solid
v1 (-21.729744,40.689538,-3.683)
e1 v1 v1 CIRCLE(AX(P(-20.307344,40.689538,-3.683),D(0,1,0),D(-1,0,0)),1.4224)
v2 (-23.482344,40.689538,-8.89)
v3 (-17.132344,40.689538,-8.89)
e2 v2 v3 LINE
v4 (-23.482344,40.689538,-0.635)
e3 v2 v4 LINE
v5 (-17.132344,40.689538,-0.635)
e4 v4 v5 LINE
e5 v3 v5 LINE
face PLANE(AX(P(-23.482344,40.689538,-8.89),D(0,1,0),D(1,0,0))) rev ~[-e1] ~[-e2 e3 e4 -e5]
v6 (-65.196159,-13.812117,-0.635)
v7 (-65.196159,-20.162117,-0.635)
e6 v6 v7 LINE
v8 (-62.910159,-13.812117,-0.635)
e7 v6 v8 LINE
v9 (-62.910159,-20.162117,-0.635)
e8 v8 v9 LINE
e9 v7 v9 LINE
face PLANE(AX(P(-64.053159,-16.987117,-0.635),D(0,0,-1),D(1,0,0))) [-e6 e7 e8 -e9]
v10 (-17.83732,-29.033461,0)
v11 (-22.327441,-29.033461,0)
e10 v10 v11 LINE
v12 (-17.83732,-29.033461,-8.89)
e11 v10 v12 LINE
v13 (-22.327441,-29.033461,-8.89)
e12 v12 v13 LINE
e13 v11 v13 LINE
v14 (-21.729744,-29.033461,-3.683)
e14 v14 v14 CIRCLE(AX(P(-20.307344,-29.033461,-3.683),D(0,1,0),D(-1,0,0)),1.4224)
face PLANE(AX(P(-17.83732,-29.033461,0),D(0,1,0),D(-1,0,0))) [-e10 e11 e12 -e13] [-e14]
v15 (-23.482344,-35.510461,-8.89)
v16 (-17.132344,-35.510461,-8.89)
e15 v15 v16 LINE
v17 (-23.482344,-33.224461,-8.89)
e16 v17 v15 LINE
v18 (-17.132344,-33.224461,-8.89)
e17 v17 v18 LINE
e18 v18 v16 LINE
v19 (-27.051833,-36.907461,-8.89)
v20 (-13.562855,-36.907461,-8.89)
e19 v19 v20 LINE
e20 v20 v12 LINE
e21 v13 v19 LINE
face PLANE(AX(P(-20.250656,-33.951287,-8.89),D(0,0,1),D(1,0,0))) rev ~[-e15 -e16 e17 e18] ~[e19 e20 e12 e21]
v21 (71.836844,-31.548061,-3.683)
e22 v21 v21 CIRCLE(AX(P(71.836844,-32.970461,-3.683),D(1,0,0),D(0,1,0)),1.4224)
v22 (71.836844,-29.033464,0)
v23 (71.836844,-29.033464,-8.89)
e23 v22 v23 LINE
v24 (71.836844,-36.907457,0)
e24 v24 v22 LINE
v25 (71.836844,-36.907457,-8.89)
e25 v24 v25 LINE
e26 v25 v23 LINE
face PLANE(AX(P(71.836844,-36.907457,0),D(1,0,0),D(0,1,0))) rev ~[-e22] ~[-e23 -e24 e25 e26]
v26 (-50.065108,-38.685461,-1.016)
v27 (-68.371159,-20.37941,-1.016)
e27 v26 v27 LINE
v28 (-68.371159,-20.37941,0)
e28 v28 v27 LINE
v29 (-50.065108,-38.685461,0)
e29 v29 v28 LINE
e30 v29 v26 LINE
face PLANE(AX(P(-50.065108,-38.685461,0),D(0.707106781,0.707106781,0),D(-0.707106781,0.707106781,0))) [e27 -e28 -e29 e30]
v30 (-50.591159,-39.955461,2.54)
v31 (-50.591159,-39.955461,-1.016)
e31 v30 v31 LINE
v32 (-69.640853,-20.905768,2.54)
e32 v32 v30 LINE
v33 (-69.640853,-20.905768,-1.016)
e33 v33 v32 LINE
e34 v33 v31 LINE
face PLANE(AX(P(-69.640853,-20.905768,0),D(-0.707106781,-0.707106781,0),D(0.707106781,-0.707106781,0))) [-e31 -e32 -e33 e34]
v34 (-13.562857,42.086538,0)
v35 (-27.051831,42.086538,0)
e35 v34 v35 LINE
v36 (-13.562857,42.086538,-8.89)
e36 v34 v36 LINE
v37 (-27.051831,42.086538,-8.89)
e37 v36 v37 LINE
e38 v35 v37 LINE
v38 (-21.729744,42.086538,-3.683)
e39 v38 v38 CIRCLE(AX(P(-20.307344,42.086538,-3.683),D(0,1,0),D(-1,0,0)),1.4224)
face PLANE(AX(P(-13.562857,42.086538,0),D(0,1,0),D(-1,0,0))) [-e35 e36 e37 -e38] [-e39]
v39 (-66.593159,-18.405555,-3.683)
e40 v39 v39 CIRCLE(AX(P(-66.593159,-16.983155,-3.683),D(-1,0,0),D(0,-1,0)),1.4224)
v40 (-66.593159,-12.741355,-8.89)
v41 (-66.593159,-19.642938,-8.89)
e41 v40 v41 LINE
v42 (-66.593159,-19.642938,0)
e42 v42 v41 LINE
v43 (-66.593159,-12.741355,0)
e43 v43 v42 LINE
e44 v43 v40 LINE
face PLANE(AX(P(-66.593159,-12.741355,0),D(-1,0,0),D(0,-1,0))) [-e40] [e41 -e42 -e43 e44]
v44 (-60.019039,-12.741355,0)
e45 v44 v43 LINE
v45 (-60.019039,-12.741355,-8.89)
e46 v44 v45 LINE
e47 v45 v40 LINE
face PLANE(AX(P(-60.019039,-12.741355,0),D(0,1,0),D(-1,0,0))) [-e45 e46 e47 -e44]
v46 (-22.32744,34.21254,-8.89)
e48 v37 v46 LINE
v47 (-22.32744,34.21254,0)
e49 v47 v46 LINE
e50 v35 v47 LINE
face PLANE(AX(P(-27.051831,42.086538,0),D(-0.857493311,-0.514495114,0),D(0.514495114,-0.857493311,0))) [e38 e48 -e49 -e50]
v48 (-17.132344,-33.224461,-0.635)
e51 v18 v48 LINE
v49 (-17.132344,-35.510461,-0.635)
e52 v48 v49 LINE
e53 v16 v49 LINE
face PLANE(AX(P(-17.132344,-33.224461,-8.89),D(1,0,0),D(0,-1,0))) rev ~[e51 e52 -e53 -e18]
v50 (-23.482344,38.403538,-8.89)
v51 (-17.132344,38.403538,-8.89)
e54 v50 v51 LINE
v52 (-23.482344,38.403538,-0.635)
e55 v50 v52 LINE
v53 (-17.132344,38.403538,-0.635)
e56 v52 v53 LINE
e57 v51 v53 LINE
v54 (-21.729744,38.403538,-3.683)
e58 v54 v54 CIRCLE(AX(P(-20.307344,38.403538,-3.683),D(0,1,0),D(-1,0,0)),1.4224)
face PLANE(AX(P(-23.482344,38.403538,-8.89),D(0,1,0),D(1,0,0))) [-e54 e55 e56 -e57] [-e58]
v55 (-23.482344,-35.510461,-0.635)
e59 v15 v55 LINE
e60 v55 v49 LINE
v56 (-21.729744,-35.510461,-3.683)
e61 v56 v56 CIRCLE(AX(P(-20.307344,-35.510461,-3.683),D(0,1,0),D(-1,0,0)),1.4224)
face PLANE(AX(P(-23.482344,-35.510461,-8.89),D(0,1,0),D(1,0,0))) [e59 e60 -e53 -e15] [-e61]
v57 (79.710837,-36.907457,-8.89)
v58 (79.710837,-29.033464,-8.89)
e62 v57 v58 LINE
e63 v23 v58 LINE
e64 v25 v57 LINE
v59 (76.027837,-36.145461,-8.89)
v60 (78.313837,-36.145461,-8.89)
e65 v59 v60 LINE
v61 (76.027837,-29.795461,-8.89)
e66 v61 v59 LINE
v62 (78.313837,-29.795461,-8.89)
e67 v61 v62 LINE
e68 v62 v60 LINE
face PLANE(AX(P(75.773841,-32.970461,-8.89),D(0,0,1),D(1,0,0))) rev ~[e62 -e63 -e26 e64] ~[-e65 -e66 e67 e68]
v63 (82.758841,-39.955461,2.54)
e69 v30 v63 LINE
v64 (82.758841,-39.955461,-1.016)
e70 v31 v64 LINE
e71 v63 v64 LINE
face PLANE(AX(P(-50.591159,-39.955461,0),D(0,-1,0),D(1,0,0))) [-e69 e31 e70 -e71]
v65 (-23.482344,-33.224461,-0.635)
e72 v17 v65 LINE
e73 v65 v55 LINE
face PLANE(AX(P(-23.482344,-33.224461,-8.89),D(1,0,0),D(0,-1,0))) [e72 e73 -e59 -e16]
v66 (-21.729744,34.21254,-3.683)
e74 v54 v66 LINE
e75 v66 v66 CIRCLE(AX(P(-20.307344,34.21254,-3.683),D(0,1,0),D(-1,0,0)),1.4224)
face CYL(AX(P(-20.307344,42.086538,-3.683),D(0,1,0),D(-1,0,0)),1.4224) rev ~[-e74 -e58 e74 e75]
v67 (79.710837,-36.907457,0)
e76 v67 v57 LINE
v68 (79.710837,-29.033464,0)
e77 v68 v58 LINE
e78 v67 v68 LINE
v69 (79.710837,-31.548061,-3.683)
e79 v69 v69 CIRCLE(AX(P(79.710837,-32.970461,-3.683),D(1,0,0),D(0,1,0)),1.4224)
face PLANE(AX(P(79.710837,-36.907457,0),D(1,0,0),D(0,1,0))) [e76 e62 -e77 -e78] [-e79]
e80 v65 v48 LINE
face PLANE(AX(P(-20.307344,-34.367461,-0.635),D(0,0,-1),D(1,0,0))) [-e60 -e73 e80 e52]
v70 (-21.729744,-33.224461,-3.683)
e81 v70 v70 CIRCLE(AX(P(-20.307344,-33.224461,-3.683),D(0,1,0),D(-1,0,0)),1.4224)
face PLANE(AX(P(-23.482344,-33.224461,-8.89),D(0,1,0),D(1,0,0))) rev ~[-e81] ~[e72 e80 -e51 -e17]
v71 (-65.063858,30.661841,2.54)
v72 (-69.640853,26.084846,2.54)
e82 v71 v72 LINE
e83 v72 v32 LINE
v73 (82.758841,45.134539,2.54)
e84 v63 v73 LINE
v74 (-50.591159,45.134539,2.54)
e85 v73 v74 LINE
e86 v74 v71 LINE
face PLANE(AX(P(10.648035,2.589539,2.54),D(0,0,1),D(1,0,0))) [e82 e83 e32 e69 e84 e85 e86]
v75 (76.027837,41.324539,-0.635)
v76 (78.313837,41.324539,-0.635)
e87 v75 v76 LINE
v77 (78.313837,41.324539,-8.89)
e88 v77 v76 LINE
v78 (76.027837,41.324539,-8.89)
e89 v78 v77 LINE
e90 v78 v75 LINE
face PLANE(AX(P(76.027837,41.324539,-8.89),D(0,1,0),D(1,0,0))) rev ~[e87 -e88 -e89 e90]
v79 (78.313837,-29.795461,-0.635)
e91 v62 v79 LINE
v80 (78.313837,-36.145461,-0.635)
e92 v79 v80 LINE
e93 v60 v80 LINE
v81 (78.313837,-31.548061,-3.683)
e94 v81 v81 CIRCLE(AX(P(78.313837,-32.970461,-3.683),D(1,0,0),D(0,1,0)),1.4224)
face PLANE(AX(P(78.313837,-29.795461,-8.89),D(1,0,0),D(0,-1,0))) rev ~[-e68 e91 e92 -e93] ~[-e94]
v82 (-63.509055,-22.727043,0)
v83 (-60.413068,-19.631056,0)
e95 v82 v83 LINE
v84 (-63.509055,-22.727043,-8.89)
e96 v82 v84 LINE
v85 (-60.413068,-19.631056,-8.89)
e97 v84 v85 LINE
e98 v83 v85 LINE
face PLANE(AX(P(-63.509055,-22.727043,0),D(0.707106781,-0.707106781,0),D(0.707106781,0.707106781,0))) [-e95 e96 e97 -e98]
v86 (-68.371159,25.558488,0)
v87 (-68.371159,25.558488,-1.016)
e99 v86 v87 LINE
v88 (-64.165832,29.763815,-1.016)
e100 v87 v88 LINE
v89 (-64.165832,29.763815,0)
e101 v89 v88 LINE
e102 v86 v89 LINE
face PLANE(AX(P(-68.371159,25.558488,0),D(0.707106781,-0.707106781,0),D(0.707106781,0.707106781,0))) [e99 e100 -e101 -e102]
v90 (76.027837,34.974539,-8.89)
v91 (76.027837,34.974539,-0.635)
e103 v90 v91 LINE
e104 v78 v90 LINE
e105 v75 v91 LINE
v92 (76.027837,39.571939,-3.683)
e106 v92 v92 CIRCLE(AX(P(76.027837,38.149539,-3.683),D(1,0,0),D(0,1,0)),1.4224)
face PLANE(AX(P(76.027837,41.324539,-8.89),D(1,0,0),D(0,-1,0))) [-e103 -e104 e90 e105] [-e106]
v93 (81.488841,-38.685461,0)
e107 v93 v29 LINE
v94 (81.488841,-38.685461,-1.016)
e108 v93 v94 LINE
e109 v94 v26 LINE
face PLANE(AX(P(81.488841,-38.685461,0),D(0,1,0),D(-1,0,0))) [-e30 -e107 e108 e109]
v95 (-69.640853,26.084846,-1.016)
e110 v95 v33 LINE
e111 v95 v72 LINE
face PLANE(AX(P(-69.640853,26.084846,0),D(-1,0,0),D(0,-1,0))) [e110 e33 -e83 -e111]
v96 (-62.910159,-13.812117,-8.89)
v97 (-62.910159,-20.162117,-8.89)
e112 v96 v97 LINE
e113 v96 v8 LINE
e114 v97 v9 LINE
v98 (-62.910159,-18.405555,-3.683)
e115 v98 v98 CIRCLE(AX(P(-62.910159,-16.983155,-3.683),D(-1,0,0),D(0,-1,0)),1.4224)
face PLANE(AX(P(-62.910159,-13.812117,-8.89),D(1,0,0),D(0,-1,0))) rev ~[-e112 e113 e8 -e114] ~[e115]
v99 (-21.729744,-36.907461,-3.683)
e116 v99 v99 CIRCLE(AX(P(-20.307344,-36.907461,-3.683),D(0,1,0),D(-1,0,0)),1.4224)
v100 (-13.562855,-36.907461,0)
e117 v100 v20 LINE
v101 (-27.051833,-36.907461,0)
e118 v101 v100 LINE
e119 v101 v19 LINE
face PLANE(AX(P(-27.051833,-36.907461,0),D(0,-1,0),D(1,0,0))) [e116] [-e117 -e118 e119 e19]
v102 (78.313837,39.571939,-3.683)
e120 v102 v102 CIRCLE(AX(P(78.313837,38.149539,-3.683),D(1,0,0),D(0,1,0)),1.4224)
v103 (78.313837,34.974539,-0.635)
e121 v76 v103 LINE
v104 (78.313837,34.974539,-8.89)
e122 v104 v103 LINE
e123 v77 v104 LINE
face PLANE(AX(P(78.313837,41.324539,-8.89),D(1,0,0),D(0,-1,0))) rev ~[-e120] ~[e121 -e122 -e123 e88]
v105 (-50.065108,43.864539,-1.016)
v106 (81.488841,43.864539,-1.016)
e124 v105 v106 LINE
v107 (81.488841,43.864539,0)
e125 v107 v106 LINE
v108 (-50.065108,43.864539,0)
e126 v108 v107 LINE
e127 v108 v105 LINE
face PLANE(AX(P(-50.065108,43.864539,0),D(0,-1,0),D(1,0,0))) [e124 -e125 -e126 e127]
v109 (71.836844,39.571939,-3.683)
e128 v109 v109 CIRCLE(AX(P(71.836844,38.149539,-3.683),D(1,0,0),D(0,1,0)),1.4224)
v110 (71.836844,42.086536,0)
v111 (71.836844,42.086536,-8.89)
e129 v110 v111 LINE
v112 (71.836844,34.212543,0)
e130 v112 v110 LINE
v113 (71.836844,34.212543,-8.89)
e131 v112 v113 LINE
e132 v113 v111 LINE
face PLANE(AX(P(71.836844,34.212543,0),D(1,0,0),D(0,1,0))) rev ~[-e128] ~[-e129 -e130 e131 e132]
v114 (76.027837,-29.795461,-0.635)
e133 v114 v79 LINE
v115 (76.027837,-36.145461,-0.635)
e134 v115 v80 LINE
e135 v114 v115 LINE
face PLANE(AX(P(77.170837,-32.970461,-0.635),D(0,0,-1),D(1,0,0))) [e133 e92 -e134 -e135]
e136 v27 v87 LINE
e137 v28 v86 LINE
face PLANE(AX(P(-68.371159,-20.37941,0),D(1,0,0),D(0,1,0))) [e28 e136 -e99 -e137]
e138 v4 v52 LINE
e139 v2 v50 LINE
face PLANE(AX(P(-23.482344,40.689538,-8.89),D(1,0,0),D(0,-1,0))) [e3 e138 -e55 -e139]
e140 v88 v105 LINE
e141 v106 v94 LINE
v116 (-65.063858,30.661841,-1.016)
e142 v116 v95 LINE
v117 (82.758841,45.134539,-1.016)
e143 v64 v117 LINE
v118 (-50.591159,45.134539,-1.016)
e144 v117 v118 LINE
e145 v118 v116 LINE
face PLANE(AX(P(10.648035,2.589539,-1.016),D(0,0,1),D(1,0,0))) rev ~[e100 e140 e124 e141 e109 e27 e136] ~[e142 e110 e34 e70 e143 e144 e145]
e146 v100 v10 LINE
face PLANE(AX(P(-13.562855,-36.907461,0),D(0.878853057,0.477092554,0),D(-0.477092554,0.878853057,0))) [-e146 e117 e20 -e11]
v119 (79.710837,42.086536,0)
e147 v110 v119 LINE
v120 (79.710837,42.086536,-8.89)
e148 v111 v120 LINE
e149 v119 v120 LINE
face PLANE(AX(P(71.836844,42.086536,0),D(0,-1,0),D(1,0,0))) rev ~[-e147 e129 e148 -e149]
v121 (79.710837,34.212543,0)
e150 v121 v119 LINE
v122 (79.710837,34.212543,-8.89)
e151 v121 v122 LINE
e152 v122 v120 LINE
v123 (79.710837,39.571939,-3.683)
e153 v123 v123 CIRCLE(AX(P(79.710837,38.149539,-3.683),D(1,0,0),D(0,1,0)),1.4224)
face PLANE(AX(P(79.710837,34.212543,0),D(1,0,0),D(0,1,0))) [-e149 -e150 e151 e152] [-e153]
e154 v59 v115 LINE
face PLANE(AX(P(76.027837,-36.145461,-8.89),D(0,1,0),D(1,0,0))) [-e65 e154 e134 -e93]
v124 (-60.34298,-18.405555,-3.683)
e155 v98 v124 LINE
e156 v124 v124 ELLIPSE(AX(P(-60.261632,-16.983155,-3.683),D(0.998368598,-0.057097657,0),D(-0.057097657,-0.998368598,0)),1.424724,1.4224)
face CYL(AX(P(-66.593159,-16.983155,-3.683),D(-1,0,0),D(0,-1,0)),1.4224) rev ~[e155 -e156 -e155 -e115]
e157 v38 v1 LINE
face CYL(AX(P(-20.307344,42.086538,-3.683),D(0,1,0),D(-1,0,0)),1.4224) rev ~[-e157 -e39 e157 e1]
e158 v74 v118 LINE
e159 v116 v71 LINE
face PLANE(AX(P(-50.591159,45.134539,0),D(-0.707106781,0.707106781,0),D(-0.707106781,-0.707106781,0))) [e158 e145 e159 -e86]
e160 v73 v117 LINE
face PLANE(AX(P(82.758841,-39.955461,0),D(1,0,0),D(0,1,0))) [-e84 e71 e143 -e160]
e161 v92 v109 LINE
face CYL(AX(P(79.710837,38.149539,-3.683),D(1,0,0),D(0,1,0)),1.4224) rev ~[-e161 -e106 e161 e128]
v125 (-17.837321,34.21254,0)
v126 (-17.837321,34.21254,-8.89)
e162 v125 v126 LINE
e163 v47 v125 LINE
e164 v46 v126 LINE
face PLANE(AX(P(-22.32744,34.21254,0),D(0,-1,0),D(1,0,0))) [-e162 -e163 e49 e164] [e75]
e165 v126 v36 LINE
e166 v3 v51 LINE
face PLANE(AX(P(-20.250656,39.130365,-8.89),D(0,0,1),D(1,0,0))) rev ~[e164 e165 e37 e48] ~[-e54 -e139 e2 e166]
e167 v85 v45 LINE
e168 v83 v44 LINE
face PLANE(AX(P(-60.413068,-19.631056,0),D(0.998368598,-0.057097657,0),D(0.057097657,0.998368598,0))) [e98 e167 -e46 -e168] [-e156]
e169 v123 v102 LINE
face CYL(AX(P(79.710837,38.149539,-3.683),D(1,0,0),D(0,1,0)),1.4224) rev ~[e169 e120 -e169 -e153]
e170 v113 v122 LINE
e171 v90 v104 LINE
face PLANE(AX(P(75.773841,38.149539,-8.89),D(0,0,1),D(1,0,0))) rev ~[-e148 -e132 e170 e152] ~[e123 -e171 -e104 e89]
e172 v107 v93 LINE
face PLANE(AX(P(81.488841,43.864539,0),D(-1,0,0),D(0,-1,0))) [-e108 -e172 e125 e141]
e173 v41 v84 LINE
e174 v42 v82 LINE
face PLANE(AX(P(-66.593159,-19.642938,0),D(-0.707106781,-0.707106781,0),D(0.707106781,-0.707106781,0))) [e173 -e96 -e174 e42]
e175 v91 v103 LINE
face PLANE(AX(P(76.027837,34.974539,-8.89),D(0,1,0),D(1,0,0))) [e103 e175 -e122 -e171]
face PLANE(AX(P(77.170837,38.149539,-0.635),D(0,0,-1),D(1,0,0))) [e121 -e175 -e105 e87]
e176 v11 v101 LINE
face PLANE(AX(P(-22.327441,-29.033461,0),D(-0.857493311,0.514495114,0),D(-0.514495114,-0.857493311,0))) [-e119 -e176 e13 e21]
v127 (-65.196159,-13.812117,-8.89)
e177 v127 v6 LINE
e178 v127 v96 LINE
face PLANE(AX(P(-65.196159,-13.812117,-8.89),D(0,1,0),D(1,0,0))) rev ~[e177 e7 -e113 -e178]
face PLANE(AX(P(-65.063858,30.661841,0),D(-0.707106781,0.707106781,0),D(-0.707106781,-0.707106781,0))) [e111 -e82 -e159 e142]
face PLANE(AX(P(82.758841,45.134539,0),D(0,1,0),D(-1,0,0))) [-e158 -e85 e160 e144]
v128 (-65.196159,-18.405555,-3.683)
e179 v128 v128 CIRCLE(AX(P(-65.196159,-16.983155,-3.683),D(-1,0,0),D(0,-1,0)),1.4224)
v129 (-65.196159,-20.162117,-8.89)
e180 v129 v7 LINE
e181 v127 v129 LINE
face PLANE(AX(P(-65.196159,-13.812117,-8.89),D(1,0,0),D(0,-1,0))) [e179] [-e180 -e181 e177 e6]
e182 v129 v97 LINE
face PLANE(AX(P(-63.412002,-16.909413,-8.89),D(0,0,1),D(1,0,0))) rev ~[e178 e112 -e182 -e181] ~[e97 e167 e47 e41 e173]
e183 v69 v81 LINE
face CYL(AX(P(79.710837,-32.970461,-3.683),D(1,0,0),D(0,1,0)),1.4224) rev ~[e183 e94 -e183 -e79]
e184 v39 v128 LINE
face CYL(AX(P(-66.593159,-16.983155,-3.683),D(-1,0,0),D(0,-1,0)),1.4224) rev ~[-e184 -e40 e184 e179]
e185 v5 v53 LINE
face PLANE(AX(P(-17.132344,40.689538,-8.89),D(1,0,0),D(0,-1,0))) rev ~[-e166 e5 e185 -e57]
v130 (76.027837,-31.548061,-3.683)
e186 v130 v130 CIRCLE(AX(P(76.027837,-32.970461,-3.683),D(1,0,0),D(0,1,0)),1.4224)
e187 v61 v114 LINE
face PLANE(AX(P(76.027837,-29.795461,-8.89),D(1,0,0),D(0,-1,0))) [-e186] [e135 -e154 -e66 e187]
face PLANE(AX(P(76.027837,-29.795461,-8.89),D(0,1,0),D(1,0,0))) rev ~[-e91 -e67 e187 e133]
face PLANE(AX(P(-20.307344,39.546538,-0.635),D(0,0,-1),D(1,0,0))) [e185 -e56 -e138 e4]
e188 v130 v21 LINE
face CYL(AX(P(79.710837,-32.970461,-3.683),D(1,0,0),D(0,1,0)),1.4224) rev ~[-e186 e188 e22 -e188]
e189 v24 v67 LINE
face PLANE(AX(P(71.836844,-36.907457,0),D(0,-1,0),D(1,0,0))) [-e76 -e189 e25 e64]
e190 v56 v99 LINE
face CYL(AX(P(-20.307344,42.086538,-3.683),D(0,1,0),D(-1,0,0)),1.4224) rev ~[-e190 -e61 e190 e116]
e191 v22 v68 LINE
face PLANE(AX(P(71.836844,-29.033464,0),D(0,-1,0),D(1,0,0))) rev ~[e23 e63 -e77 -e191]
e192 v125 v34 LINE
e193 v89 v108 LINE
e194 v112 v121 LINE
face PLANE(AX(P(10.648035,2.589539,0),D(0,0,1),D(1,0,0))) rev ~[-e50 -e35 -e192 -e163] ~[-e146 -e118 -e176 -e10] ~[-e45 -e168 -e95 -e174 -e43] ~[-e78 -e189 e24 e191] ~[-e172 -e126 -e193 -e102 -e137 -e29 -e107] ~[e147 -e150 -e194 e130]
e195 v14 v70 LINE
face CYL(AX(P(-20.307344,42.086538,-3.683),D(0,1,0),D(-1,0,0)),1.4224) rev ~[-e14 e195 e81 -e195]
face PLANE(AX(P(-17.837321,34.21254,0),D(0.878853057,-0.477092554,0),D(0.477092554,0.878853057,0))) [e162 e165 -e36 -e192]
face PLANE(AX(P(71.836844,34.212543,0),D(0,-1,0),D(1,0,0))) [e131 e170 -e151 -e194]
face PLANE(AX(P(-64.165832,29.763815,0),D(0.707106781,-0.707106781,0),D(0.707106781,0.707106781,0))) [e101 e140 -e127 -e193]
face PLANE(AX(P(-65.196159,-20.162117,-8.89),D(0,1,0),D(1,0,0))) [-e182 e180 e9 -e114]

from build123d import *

# Parameters (mm, degrees)
F0_W      = 7.8739928325
F0_H      = 7.8739928325
F1_DEPTH  = 2.54
F2_DEPTH  = 1.016
F3_DEPTH  = 8.89
F8_W      = 2.286
F8_H      = 6.35
F7_W      = 2.286
F7_H      = 6.35
F4_W      = 6.35
F4_H      = 2.286
F5_W      = 2.286
F5_H      = 6.35
F6_W      = 6.35
F6_H      = 2.286
F9_DEPTH  = 8.255
F10_R     = 1.4224
F11_DEPTH = 101.6
F12_R     = 1.4224
F13_R     = 1.4224
F14_DEPTH = 25.4
F15_R     = 1.4224
F16_DEPTH = 25.4


# Not quite as in the source:
# - a feature names something its author has since deleted; it is built from what else it names


with BuildPart() as f1:
    # F0 (on Top) → F1 (new body)
    with BuildSketch(Plane.XY):
        Polygon((-50.5911594971, 45.1345390935), (-65.0638575705, 30.6618410202), (-69.6408525109, 26.0848460797), (-69.6408525109, 9.5127671957), (-69.6408525109, -20.9057678927), (-62.6880467633, -27.8585736403), (-50.5911594971, -39.9554609065), (82.7588405029, -39.9554609065), (82.7588405029, -17.0967224985), (82.7588405029, 43.8645390935), (82.7588405029, 45.1345390935), (33.1444106996, 45.1345390935), (-20.2568043023, 45.1345390935), align=None)
        Polygon((-50.0651082729, -38.6854609065), (-68.3711594971, -20.3794096823), (-68.3711594971, 25.5584878693), (-64.1658319583, 29.763815408), (-50.0651082729, 43.8645390935), (81.4888405029, 43.8645390935), (81.4888405029, -38.6854609065), align=None, mode=Mode.SUBTRACT)
        Polygon((-68.3711594971, 25.5584878693), (-68.3711594971, -20.3794096823), (-50.0651082729, -38.6854609065), (81.4888405029, -38.6854609065), (81.4888405029, 43.8645390935), (-50.0651082729, 43.8645390935), (-64.1658319583, 29.763815408), align=None)
        Polygon((-13.562855112, -36.9074608927), (-27.0518330949, -36.9074608927), (-22.3274411258, -29.0334609202), (-17.8373202542, -29.0334609202), align=None, mode=Mode.SUBTRACT)
        Polygon((-66.5931594971, -19.6429379684), (-66.5931594971, -12.7413552397), (-60.0190392027, -12.7413552397), (-60.413067775, -19.6310556945), (-63.509054773, -22.7270426925), align=None, mode=Mode.SUBTRACT)
        with BuildLine():
            Line((-49.5390570487, -37.4154609065), (-61.7130058245, -25.2415121307))
            Line((-61.7130058245, -25.2415121307), (-58.120903376, -21.6494096823))
            Line((-58.120903376, -21.6494096823), (-56.9411594971, -12.2333584581))
            Line((-56.9411594971, -12.2333584581), (-56.9411594971, -9.6933584581))
            Line((-56.9411594971, -9.6933584581), (-67.1011594971, -9.6933584581))
            Line((-67.1011594971, -9.6933584581), (-67.1011594971, 25.0324366451))
            Line((-67.1011594971, 25.0324366451), (-49.5390570487, 42.5945390935))
            Line((-49.5390570487, 42.5945390935), (-33.3653066841, 42.5945390935))
            ThreePointArc((-33.3653066841, 42.5945390935), (-30.8623950498, 41.9351536832), (-29.0092406655, 40.128174271))
            Line((-29.0092406655, 40.128174271), (-25.1550660971, 33.7045390935))
            ThreePointArc((-25.1550660971, 33.7045390935), (-23.284234992, 31.8649136199), (-20.7556570459, 31.1645390935))
            Line((-20.7556570459, 31.1645390935), (-19.3944751483, 31.1645390935))
            ThreePointArc((-19.3944751483, 31.1645390935), (-16.8544751483, 31.8451300423), (-14.9950660971, 33.7045390935))
            Line((-14.9950660971, 33.7045390935), (-11.6110890868, 39.9381692669))
            ThreePointArc((-11.6110890868, 39.9381692669), (-9.7440488814, 41.8802258253), (-7.1465155593, 42.5945390935))
            Line((-7.1465155593, 42.5945390935), (67.5188405029, 42.5945390935))
            ThreePointArc((67.5188405029, 42.5945390935), (69.3148917271, 41.8505903177), (70.0588405029, 40.0545390935))
            Line((70.0588405029, 40.0545390935), (70.0588405029, 32.4345390935))
            Line((70.0588405029, 32.4345390935), (77.6788405029, 32.4345390935))
            ThreePointArc((77.6788405029, 32.4345390935), (79.4748917271, 31.6905903177), (80.2188405029, 29.8945390935))
            Line((80.2188405029, 29.8945390935), (80.2188405029, -24.7154609065))
            ThreePointArc((80.2188405029, -24.7154609065), (79.4748917271, -26.5115121307), (77.6788405029, -27.2554609065))
            Line((77.6788405029, -27.2554609065), (70.0588405029, -27.2554609065))
            Line((70.0588405029, -27.2554609065), (70.0588405029, -34.8754609065))
            ThreePointArc((70.0588405029, -34.8754609065), (69.3148917271, -36.6715121307), (67.5188405029, -37.4154609065))
            Line((67.5188405029, -37.4154609065), (-7.1465155593, -37.4154609065))
            ThreePointArc((-7.1465155593, -37.4154609065), (-9.7440488814, -36.7011476383), (-11.6110890868, -34.7590910799))
            Line((-11.6110890868, -34.7590910799), (-14.9950660971, -28.5254609065))
            ThreePointArc((-14.9950660971, -28.5254609065), (-16.8544751483, -26.6660518553), (-19.3944751483, -25.9854609065))
            Line((-19.3944751483, -25.9854609065), (-20.7556570459, -25.9854609065))
            ThreePointArc((-20.7556570459, -25.9854609065), (-23.284234992, -26.6858354329), (-25.1550660971, -28.5254609065))
            Line((-25.1550660971, -28.5254609065), (-29.0092406655, -34.949096084))
            ThreePointArc((-29.0092406655, -34.949096084), (-30.8623950498, -36.7560754962), (-33.3653066841, -37.4154609065))
            Line((-33.3653066841, -37.4154609065), (-49.5390570487, -37.4154609065))
        make_face(mode=Mode.SUBTRACT)
        with Locations((75.7738405029, -32.9704609065)):
            Rectangle(F0_W, F0_H, mode=Mode.SUBTRACT)
        Polygon((-27.0518310596, 42.0865379274), (-13.5628570488, 42.0865379274), (-17.8373209399, 34.2125402596), (-22.3274404733, 34.2125402596), align=None, mode=Mode.SUBTRACT)
        with Locations((75.7738405029, 38.1495390935)):
            Rectangle(F0_W, F0_H, mode=Mode.SUBTRACT)
        with BuildLine():
            Line((-58.120903376, -21.6494096823), (-61.7130058245, -25.2415121307))
            Line((-61.7130058245, -25.2415121307), (-49.5390570487, -37.4154609065))
            Line((-49.5390570487, -37.4154609065), (-33.3653066841, -37.4154609065))
            ThreePointArc((-33.3653066841, -37.4154609065), (-30.8623950498, -36.7560754962), (-29.0092406655, -34.949096084))
            Line((-29.0092406655, -34.949096084), (-25.1550660971, -28.5254609065))
            ThreePointArc((-25.1550660971, -28.5254609065), (-23.284234992, -26.6858354329), (-20.7556570459, -25.9854609065))
            Line((-20.7556570459, -25.9854609065), (-19.3944751483, -25.9854609065))
            ThreePointArc((-19.3944751483, -25.9854609065), (-16.8544751483, -26.6660518553), (-14.9950660971, -28.5254609065))
            Line((-14.9950660971, -28.5254609065), (-11.6110890868, -34.7590910799))
            ThreePointArc((-11.6110890868, -34.7590910799), (-9.7440488814, -36.7011476383), (-7.1465155593, -37.4154609065))
            Line((-7.1465155593, -37.4154609065), (67.5188405029, -37.4154609065))
            ThreePointArc((67.5188405029, -37.4154609065), (69.3148917271, -36.6715121307), (70.0588405029, -34.8754609065))
            Line((70.0588405029, -34.8754609065), (70.0588405029, -27.2554609065))
            Line((70.0588405029, -27.2554609065), (77.6788405029, -27.2554609065))
            ThreePointArc((77.6788405029, -27.2554609065), (79.4748917271, -26.5115121307), (80.2188405029, -24.7154609065))
            Line((80.2188405029, -24.7154609065), (80.2188405029, 29.8945390935))
            ThreePointArc((80.2188405029, 29.8945390935), (79.4748917271, 31.6905903177), (77.6788405029, 32.4345390935))
            Line((77.6788405029, 32.4345390935), (70.0588405029, 32.4345390935))
            Line((70.0588405029, 32.4345390935), (70.0588405029, 40.0545390935))
            ThreePointArc((70.0588405029, 40.0545390935), (69.3148917271, 41.8505903177), (67.5188405029, 42.5945390935))
            Line((67.5188405029, 42.5945390935), (-7.1465155593, 42.5945390935))
            ThreePointArc((-7.1465155593, 42.5945390935), (-9.7440488814, 41.8802258253), (-11.6110890868, 39.9381692669))
            Line((-11.6110890868, 39.9381692669), (-14.9950660971, 33.7045390935))
            ThreePointArc((-14.9950660971, 33.7045390935), (-16.8544751483, 31.8451300423), (-19.3944751483, 31.1645390935))
            Line((-19.3944751483, 31.1645390935), (-20.7556570459, 31.1645390935))
            ThreePointArc((-20.7556570459, 31.1645390935), (-23.284234992, 31.8649136199), (-25.1550660971, 33.7045390935))
            Line((-25.1550660971, 33.7045390935), (-29.0092406655, 40.128174271))
            ThreePointArc((-29.0092406655, 40.128174271), (-30.8623950498, 41.9351536832), (-33.3653066841, 42.5945390935))
            Line((-33.3653066841, 42.5945390935), (-49.5390570487, 42.5945390935))
            Line((-49.5390570487, 42.5945390935), (-67.1011594971, 25.0324366451))
            Line((-67.1011594971, 25.0324366451), (-67.1011594971, -9.6933584581))
            Line((-67.1011594971, -9.6933584581), (-56.9411594971, -9.6933584581))
            Line((-56.9411594971, -9.6933584581), (-56.9411594971, -12.2333584581))
            Line((-56.9411594971, -12.2333584581), (-58.120903376, -21.6494096823))
        make_face()
        Polygon((-22.3274411258, -29.0334609202), (-27.0518330949, -36.9074608927), (-13.562855112, -36.9074608927), (-17.8373202542, -29.0334609202), align=None)
        Polygon((-17.8373209399, 34.2125402596), (-13.5628570488, 42.0865379274), (-27.0518310596, 42.0865379274), (-22.3274404733, 34.2125402596), align=None)
        with Locations((75.7738405029, -32.9704609065)):
            Rectangle(F0_W, F0_H)
        with Locations((75.7738405029, 38.1495390935)):
            Rectangle(F0_W, F0_H)
        Polygon((-60.0190392027, -12.7413552397), (-66.5931594971, -12.7413552397), (-66.5931594971, -19.6429379684), (-63.509054773, -22.7270426925), (-60.413067775, -19.6310556945), align=None)
    extrude(amount=F1_DEPTH)

    # F0 (on Top) → F2 (join)
    with BuildSketch(Plane.XY):
        Polygon((-50.5911594971, 45.1345390935), (-65.0638575705, 30.6618410202), (-69.6408525109, 26.0848460797), (-69.6408525109, 9.5127671957), (-69.6408525109, -20.9057678927), (-62.6880467633, -27.8585736403), (-50.5911594971, -39.9554609065), (82.7588405029, -39.9554609065), (82.7588405029, -17.0967224985), (82.7588405029, 43.8645390935), (82.7588405029, 45.1345390935), (33.1444106996, 45.1345390935), (-20.2568043023, 45.1345390935), align=None)
        Polygon((-50.0651082729, -38.6854609065), (-68.3711594971, -20.3794096823), (-68.3711594971, 25.5584878693), (-64.1658319583, 29.763815408), (-50.0651082729, 43.8645390935), (81.4888405029, 43.8645390935), (81.4888405029, -38.6854609065), align=None, mode=Mode.SUBTRACT)
    extrude(amount=-F2_DEPTH)

    # F0 (on Top) → F3 (join)
    with BuildSketch(Plane.XY):
        Polygon((-17.8373209399, 34.2125402596), (-13.5628570488, 42.0865379274), (-27.0518310596, 42.0865379274), (-22.3274404733, 34.2125402596), align=None)
        Polygon((-22.3274411258, -29.0334609202), (-27.0518330949, -36.9074608927), (-13.562855112, -36.9074608927), (-17.8373202542, -29.0334609202), align=None)
        Polygon((-60.0190392027, -12.7413552397), (-66.5931594971, -12.7413552397), (-66.5931594971, -19.6429379684), (-63.509054773, -22.7270426925), (-60.413067775, -19.6310556945), align=None)
        with Locations((75.7738405029, -32.9704609065)):
            Rectangle(F0_W, F0_H)
        with Locations((75.7738405029, 38.1495390935)):
            Rectangle(F0_W, F0_H)
    extrude(amount=-F3_DEPTH)

    # F8 (on face) + F7 (on face) + F4 (on face) + F5 (on face) + F6 (on face) → F9 (cut)
    with BuildSketch(Plane(origin=(0, 0, -8.89), x_dir=(1, 0, 0), z_dir=(0, 0, -1))):
        with Locations((77.1708369192, -38.1495390935)):
            Rectangle(F8_W, F8_H)
    with BuildSketch(Plane(origin=(0, 0, -8.89), x_dir=(1, 0, 0), z_dir=(0, 0, -1))):
        with Locations((77.1708369192, 32.9704609065)):
            Rectangle(F7_W, F7_H)
    with BuildSketch(Plane(origin=(0, 0, -8.89), x_dir=(1, 0, 0), z_dir=(0, 0, -1))):
        with Locations((-20.3073441034, 34.3674608927)):
            Rectangle(F4_W, F4_H)
    with BuildSketch(Plane(origin=(0, 0, -8.89), x_dir=(1, 0, 0), z_dir=(0, 0, -1))):
        with Locations((-64.0531594971, 16.9871170074)):
            Rectangle(F5_W, F5_H)
    with BuildSketch(Plane(origin=(0, 0, -8.89), x_dir=(1, 0, 0), z_dir=(0, 0, -1))):
        with Locations((-20.3073440542, -39.5465379274)):
            Rectangle(F6_W, F6_H)
    extrude(amount=-F9_DEPTH, mode=Mode.SUBTRACT)

    # F10 (on face) → F11 (cut)
    with BuildSketch(Plane(origin=(0, 42.0865379274, 0), x_dir=(-1, 0, 0), z_dir=(0, 1, 0))):
        with Locations((20.3073440542, -3.683)):
            Circle(F10_R)
    extrude(amount=-F11_DEPTH, mode=Mode.SUBTRACT)

    # F12 (on face) + F13 (on face) → F14 (cut)
    with BuildSketch(Plane.YZ.offset(79.7108369192)):
        with Locations((38.1495390935, -3.683)):
            Circle(F12_R)
    with BuildSketch(Plane.YZ.offset(79.7108369192)):
        with Locations((-32.9704609065, -3.683)):
            Circle(F13_R)
    extrude(amount=-F14_DEPTH, mode=Mode.SUBTRACT)

    # F15 (on face) → F16 (cut)
    with BuildSketch(Plane(origin=(-66.5931594971, 0, 0), x_dir=(0, -1, 0), z_dir=(-1, 0, 0))):
        with Locations((16.9831552397, -3.683)):
            Circle(F15_R)
    extrude(amount=-F16_DEPTH, mode=Mode.SUBTRACT)


solid = f1.part
